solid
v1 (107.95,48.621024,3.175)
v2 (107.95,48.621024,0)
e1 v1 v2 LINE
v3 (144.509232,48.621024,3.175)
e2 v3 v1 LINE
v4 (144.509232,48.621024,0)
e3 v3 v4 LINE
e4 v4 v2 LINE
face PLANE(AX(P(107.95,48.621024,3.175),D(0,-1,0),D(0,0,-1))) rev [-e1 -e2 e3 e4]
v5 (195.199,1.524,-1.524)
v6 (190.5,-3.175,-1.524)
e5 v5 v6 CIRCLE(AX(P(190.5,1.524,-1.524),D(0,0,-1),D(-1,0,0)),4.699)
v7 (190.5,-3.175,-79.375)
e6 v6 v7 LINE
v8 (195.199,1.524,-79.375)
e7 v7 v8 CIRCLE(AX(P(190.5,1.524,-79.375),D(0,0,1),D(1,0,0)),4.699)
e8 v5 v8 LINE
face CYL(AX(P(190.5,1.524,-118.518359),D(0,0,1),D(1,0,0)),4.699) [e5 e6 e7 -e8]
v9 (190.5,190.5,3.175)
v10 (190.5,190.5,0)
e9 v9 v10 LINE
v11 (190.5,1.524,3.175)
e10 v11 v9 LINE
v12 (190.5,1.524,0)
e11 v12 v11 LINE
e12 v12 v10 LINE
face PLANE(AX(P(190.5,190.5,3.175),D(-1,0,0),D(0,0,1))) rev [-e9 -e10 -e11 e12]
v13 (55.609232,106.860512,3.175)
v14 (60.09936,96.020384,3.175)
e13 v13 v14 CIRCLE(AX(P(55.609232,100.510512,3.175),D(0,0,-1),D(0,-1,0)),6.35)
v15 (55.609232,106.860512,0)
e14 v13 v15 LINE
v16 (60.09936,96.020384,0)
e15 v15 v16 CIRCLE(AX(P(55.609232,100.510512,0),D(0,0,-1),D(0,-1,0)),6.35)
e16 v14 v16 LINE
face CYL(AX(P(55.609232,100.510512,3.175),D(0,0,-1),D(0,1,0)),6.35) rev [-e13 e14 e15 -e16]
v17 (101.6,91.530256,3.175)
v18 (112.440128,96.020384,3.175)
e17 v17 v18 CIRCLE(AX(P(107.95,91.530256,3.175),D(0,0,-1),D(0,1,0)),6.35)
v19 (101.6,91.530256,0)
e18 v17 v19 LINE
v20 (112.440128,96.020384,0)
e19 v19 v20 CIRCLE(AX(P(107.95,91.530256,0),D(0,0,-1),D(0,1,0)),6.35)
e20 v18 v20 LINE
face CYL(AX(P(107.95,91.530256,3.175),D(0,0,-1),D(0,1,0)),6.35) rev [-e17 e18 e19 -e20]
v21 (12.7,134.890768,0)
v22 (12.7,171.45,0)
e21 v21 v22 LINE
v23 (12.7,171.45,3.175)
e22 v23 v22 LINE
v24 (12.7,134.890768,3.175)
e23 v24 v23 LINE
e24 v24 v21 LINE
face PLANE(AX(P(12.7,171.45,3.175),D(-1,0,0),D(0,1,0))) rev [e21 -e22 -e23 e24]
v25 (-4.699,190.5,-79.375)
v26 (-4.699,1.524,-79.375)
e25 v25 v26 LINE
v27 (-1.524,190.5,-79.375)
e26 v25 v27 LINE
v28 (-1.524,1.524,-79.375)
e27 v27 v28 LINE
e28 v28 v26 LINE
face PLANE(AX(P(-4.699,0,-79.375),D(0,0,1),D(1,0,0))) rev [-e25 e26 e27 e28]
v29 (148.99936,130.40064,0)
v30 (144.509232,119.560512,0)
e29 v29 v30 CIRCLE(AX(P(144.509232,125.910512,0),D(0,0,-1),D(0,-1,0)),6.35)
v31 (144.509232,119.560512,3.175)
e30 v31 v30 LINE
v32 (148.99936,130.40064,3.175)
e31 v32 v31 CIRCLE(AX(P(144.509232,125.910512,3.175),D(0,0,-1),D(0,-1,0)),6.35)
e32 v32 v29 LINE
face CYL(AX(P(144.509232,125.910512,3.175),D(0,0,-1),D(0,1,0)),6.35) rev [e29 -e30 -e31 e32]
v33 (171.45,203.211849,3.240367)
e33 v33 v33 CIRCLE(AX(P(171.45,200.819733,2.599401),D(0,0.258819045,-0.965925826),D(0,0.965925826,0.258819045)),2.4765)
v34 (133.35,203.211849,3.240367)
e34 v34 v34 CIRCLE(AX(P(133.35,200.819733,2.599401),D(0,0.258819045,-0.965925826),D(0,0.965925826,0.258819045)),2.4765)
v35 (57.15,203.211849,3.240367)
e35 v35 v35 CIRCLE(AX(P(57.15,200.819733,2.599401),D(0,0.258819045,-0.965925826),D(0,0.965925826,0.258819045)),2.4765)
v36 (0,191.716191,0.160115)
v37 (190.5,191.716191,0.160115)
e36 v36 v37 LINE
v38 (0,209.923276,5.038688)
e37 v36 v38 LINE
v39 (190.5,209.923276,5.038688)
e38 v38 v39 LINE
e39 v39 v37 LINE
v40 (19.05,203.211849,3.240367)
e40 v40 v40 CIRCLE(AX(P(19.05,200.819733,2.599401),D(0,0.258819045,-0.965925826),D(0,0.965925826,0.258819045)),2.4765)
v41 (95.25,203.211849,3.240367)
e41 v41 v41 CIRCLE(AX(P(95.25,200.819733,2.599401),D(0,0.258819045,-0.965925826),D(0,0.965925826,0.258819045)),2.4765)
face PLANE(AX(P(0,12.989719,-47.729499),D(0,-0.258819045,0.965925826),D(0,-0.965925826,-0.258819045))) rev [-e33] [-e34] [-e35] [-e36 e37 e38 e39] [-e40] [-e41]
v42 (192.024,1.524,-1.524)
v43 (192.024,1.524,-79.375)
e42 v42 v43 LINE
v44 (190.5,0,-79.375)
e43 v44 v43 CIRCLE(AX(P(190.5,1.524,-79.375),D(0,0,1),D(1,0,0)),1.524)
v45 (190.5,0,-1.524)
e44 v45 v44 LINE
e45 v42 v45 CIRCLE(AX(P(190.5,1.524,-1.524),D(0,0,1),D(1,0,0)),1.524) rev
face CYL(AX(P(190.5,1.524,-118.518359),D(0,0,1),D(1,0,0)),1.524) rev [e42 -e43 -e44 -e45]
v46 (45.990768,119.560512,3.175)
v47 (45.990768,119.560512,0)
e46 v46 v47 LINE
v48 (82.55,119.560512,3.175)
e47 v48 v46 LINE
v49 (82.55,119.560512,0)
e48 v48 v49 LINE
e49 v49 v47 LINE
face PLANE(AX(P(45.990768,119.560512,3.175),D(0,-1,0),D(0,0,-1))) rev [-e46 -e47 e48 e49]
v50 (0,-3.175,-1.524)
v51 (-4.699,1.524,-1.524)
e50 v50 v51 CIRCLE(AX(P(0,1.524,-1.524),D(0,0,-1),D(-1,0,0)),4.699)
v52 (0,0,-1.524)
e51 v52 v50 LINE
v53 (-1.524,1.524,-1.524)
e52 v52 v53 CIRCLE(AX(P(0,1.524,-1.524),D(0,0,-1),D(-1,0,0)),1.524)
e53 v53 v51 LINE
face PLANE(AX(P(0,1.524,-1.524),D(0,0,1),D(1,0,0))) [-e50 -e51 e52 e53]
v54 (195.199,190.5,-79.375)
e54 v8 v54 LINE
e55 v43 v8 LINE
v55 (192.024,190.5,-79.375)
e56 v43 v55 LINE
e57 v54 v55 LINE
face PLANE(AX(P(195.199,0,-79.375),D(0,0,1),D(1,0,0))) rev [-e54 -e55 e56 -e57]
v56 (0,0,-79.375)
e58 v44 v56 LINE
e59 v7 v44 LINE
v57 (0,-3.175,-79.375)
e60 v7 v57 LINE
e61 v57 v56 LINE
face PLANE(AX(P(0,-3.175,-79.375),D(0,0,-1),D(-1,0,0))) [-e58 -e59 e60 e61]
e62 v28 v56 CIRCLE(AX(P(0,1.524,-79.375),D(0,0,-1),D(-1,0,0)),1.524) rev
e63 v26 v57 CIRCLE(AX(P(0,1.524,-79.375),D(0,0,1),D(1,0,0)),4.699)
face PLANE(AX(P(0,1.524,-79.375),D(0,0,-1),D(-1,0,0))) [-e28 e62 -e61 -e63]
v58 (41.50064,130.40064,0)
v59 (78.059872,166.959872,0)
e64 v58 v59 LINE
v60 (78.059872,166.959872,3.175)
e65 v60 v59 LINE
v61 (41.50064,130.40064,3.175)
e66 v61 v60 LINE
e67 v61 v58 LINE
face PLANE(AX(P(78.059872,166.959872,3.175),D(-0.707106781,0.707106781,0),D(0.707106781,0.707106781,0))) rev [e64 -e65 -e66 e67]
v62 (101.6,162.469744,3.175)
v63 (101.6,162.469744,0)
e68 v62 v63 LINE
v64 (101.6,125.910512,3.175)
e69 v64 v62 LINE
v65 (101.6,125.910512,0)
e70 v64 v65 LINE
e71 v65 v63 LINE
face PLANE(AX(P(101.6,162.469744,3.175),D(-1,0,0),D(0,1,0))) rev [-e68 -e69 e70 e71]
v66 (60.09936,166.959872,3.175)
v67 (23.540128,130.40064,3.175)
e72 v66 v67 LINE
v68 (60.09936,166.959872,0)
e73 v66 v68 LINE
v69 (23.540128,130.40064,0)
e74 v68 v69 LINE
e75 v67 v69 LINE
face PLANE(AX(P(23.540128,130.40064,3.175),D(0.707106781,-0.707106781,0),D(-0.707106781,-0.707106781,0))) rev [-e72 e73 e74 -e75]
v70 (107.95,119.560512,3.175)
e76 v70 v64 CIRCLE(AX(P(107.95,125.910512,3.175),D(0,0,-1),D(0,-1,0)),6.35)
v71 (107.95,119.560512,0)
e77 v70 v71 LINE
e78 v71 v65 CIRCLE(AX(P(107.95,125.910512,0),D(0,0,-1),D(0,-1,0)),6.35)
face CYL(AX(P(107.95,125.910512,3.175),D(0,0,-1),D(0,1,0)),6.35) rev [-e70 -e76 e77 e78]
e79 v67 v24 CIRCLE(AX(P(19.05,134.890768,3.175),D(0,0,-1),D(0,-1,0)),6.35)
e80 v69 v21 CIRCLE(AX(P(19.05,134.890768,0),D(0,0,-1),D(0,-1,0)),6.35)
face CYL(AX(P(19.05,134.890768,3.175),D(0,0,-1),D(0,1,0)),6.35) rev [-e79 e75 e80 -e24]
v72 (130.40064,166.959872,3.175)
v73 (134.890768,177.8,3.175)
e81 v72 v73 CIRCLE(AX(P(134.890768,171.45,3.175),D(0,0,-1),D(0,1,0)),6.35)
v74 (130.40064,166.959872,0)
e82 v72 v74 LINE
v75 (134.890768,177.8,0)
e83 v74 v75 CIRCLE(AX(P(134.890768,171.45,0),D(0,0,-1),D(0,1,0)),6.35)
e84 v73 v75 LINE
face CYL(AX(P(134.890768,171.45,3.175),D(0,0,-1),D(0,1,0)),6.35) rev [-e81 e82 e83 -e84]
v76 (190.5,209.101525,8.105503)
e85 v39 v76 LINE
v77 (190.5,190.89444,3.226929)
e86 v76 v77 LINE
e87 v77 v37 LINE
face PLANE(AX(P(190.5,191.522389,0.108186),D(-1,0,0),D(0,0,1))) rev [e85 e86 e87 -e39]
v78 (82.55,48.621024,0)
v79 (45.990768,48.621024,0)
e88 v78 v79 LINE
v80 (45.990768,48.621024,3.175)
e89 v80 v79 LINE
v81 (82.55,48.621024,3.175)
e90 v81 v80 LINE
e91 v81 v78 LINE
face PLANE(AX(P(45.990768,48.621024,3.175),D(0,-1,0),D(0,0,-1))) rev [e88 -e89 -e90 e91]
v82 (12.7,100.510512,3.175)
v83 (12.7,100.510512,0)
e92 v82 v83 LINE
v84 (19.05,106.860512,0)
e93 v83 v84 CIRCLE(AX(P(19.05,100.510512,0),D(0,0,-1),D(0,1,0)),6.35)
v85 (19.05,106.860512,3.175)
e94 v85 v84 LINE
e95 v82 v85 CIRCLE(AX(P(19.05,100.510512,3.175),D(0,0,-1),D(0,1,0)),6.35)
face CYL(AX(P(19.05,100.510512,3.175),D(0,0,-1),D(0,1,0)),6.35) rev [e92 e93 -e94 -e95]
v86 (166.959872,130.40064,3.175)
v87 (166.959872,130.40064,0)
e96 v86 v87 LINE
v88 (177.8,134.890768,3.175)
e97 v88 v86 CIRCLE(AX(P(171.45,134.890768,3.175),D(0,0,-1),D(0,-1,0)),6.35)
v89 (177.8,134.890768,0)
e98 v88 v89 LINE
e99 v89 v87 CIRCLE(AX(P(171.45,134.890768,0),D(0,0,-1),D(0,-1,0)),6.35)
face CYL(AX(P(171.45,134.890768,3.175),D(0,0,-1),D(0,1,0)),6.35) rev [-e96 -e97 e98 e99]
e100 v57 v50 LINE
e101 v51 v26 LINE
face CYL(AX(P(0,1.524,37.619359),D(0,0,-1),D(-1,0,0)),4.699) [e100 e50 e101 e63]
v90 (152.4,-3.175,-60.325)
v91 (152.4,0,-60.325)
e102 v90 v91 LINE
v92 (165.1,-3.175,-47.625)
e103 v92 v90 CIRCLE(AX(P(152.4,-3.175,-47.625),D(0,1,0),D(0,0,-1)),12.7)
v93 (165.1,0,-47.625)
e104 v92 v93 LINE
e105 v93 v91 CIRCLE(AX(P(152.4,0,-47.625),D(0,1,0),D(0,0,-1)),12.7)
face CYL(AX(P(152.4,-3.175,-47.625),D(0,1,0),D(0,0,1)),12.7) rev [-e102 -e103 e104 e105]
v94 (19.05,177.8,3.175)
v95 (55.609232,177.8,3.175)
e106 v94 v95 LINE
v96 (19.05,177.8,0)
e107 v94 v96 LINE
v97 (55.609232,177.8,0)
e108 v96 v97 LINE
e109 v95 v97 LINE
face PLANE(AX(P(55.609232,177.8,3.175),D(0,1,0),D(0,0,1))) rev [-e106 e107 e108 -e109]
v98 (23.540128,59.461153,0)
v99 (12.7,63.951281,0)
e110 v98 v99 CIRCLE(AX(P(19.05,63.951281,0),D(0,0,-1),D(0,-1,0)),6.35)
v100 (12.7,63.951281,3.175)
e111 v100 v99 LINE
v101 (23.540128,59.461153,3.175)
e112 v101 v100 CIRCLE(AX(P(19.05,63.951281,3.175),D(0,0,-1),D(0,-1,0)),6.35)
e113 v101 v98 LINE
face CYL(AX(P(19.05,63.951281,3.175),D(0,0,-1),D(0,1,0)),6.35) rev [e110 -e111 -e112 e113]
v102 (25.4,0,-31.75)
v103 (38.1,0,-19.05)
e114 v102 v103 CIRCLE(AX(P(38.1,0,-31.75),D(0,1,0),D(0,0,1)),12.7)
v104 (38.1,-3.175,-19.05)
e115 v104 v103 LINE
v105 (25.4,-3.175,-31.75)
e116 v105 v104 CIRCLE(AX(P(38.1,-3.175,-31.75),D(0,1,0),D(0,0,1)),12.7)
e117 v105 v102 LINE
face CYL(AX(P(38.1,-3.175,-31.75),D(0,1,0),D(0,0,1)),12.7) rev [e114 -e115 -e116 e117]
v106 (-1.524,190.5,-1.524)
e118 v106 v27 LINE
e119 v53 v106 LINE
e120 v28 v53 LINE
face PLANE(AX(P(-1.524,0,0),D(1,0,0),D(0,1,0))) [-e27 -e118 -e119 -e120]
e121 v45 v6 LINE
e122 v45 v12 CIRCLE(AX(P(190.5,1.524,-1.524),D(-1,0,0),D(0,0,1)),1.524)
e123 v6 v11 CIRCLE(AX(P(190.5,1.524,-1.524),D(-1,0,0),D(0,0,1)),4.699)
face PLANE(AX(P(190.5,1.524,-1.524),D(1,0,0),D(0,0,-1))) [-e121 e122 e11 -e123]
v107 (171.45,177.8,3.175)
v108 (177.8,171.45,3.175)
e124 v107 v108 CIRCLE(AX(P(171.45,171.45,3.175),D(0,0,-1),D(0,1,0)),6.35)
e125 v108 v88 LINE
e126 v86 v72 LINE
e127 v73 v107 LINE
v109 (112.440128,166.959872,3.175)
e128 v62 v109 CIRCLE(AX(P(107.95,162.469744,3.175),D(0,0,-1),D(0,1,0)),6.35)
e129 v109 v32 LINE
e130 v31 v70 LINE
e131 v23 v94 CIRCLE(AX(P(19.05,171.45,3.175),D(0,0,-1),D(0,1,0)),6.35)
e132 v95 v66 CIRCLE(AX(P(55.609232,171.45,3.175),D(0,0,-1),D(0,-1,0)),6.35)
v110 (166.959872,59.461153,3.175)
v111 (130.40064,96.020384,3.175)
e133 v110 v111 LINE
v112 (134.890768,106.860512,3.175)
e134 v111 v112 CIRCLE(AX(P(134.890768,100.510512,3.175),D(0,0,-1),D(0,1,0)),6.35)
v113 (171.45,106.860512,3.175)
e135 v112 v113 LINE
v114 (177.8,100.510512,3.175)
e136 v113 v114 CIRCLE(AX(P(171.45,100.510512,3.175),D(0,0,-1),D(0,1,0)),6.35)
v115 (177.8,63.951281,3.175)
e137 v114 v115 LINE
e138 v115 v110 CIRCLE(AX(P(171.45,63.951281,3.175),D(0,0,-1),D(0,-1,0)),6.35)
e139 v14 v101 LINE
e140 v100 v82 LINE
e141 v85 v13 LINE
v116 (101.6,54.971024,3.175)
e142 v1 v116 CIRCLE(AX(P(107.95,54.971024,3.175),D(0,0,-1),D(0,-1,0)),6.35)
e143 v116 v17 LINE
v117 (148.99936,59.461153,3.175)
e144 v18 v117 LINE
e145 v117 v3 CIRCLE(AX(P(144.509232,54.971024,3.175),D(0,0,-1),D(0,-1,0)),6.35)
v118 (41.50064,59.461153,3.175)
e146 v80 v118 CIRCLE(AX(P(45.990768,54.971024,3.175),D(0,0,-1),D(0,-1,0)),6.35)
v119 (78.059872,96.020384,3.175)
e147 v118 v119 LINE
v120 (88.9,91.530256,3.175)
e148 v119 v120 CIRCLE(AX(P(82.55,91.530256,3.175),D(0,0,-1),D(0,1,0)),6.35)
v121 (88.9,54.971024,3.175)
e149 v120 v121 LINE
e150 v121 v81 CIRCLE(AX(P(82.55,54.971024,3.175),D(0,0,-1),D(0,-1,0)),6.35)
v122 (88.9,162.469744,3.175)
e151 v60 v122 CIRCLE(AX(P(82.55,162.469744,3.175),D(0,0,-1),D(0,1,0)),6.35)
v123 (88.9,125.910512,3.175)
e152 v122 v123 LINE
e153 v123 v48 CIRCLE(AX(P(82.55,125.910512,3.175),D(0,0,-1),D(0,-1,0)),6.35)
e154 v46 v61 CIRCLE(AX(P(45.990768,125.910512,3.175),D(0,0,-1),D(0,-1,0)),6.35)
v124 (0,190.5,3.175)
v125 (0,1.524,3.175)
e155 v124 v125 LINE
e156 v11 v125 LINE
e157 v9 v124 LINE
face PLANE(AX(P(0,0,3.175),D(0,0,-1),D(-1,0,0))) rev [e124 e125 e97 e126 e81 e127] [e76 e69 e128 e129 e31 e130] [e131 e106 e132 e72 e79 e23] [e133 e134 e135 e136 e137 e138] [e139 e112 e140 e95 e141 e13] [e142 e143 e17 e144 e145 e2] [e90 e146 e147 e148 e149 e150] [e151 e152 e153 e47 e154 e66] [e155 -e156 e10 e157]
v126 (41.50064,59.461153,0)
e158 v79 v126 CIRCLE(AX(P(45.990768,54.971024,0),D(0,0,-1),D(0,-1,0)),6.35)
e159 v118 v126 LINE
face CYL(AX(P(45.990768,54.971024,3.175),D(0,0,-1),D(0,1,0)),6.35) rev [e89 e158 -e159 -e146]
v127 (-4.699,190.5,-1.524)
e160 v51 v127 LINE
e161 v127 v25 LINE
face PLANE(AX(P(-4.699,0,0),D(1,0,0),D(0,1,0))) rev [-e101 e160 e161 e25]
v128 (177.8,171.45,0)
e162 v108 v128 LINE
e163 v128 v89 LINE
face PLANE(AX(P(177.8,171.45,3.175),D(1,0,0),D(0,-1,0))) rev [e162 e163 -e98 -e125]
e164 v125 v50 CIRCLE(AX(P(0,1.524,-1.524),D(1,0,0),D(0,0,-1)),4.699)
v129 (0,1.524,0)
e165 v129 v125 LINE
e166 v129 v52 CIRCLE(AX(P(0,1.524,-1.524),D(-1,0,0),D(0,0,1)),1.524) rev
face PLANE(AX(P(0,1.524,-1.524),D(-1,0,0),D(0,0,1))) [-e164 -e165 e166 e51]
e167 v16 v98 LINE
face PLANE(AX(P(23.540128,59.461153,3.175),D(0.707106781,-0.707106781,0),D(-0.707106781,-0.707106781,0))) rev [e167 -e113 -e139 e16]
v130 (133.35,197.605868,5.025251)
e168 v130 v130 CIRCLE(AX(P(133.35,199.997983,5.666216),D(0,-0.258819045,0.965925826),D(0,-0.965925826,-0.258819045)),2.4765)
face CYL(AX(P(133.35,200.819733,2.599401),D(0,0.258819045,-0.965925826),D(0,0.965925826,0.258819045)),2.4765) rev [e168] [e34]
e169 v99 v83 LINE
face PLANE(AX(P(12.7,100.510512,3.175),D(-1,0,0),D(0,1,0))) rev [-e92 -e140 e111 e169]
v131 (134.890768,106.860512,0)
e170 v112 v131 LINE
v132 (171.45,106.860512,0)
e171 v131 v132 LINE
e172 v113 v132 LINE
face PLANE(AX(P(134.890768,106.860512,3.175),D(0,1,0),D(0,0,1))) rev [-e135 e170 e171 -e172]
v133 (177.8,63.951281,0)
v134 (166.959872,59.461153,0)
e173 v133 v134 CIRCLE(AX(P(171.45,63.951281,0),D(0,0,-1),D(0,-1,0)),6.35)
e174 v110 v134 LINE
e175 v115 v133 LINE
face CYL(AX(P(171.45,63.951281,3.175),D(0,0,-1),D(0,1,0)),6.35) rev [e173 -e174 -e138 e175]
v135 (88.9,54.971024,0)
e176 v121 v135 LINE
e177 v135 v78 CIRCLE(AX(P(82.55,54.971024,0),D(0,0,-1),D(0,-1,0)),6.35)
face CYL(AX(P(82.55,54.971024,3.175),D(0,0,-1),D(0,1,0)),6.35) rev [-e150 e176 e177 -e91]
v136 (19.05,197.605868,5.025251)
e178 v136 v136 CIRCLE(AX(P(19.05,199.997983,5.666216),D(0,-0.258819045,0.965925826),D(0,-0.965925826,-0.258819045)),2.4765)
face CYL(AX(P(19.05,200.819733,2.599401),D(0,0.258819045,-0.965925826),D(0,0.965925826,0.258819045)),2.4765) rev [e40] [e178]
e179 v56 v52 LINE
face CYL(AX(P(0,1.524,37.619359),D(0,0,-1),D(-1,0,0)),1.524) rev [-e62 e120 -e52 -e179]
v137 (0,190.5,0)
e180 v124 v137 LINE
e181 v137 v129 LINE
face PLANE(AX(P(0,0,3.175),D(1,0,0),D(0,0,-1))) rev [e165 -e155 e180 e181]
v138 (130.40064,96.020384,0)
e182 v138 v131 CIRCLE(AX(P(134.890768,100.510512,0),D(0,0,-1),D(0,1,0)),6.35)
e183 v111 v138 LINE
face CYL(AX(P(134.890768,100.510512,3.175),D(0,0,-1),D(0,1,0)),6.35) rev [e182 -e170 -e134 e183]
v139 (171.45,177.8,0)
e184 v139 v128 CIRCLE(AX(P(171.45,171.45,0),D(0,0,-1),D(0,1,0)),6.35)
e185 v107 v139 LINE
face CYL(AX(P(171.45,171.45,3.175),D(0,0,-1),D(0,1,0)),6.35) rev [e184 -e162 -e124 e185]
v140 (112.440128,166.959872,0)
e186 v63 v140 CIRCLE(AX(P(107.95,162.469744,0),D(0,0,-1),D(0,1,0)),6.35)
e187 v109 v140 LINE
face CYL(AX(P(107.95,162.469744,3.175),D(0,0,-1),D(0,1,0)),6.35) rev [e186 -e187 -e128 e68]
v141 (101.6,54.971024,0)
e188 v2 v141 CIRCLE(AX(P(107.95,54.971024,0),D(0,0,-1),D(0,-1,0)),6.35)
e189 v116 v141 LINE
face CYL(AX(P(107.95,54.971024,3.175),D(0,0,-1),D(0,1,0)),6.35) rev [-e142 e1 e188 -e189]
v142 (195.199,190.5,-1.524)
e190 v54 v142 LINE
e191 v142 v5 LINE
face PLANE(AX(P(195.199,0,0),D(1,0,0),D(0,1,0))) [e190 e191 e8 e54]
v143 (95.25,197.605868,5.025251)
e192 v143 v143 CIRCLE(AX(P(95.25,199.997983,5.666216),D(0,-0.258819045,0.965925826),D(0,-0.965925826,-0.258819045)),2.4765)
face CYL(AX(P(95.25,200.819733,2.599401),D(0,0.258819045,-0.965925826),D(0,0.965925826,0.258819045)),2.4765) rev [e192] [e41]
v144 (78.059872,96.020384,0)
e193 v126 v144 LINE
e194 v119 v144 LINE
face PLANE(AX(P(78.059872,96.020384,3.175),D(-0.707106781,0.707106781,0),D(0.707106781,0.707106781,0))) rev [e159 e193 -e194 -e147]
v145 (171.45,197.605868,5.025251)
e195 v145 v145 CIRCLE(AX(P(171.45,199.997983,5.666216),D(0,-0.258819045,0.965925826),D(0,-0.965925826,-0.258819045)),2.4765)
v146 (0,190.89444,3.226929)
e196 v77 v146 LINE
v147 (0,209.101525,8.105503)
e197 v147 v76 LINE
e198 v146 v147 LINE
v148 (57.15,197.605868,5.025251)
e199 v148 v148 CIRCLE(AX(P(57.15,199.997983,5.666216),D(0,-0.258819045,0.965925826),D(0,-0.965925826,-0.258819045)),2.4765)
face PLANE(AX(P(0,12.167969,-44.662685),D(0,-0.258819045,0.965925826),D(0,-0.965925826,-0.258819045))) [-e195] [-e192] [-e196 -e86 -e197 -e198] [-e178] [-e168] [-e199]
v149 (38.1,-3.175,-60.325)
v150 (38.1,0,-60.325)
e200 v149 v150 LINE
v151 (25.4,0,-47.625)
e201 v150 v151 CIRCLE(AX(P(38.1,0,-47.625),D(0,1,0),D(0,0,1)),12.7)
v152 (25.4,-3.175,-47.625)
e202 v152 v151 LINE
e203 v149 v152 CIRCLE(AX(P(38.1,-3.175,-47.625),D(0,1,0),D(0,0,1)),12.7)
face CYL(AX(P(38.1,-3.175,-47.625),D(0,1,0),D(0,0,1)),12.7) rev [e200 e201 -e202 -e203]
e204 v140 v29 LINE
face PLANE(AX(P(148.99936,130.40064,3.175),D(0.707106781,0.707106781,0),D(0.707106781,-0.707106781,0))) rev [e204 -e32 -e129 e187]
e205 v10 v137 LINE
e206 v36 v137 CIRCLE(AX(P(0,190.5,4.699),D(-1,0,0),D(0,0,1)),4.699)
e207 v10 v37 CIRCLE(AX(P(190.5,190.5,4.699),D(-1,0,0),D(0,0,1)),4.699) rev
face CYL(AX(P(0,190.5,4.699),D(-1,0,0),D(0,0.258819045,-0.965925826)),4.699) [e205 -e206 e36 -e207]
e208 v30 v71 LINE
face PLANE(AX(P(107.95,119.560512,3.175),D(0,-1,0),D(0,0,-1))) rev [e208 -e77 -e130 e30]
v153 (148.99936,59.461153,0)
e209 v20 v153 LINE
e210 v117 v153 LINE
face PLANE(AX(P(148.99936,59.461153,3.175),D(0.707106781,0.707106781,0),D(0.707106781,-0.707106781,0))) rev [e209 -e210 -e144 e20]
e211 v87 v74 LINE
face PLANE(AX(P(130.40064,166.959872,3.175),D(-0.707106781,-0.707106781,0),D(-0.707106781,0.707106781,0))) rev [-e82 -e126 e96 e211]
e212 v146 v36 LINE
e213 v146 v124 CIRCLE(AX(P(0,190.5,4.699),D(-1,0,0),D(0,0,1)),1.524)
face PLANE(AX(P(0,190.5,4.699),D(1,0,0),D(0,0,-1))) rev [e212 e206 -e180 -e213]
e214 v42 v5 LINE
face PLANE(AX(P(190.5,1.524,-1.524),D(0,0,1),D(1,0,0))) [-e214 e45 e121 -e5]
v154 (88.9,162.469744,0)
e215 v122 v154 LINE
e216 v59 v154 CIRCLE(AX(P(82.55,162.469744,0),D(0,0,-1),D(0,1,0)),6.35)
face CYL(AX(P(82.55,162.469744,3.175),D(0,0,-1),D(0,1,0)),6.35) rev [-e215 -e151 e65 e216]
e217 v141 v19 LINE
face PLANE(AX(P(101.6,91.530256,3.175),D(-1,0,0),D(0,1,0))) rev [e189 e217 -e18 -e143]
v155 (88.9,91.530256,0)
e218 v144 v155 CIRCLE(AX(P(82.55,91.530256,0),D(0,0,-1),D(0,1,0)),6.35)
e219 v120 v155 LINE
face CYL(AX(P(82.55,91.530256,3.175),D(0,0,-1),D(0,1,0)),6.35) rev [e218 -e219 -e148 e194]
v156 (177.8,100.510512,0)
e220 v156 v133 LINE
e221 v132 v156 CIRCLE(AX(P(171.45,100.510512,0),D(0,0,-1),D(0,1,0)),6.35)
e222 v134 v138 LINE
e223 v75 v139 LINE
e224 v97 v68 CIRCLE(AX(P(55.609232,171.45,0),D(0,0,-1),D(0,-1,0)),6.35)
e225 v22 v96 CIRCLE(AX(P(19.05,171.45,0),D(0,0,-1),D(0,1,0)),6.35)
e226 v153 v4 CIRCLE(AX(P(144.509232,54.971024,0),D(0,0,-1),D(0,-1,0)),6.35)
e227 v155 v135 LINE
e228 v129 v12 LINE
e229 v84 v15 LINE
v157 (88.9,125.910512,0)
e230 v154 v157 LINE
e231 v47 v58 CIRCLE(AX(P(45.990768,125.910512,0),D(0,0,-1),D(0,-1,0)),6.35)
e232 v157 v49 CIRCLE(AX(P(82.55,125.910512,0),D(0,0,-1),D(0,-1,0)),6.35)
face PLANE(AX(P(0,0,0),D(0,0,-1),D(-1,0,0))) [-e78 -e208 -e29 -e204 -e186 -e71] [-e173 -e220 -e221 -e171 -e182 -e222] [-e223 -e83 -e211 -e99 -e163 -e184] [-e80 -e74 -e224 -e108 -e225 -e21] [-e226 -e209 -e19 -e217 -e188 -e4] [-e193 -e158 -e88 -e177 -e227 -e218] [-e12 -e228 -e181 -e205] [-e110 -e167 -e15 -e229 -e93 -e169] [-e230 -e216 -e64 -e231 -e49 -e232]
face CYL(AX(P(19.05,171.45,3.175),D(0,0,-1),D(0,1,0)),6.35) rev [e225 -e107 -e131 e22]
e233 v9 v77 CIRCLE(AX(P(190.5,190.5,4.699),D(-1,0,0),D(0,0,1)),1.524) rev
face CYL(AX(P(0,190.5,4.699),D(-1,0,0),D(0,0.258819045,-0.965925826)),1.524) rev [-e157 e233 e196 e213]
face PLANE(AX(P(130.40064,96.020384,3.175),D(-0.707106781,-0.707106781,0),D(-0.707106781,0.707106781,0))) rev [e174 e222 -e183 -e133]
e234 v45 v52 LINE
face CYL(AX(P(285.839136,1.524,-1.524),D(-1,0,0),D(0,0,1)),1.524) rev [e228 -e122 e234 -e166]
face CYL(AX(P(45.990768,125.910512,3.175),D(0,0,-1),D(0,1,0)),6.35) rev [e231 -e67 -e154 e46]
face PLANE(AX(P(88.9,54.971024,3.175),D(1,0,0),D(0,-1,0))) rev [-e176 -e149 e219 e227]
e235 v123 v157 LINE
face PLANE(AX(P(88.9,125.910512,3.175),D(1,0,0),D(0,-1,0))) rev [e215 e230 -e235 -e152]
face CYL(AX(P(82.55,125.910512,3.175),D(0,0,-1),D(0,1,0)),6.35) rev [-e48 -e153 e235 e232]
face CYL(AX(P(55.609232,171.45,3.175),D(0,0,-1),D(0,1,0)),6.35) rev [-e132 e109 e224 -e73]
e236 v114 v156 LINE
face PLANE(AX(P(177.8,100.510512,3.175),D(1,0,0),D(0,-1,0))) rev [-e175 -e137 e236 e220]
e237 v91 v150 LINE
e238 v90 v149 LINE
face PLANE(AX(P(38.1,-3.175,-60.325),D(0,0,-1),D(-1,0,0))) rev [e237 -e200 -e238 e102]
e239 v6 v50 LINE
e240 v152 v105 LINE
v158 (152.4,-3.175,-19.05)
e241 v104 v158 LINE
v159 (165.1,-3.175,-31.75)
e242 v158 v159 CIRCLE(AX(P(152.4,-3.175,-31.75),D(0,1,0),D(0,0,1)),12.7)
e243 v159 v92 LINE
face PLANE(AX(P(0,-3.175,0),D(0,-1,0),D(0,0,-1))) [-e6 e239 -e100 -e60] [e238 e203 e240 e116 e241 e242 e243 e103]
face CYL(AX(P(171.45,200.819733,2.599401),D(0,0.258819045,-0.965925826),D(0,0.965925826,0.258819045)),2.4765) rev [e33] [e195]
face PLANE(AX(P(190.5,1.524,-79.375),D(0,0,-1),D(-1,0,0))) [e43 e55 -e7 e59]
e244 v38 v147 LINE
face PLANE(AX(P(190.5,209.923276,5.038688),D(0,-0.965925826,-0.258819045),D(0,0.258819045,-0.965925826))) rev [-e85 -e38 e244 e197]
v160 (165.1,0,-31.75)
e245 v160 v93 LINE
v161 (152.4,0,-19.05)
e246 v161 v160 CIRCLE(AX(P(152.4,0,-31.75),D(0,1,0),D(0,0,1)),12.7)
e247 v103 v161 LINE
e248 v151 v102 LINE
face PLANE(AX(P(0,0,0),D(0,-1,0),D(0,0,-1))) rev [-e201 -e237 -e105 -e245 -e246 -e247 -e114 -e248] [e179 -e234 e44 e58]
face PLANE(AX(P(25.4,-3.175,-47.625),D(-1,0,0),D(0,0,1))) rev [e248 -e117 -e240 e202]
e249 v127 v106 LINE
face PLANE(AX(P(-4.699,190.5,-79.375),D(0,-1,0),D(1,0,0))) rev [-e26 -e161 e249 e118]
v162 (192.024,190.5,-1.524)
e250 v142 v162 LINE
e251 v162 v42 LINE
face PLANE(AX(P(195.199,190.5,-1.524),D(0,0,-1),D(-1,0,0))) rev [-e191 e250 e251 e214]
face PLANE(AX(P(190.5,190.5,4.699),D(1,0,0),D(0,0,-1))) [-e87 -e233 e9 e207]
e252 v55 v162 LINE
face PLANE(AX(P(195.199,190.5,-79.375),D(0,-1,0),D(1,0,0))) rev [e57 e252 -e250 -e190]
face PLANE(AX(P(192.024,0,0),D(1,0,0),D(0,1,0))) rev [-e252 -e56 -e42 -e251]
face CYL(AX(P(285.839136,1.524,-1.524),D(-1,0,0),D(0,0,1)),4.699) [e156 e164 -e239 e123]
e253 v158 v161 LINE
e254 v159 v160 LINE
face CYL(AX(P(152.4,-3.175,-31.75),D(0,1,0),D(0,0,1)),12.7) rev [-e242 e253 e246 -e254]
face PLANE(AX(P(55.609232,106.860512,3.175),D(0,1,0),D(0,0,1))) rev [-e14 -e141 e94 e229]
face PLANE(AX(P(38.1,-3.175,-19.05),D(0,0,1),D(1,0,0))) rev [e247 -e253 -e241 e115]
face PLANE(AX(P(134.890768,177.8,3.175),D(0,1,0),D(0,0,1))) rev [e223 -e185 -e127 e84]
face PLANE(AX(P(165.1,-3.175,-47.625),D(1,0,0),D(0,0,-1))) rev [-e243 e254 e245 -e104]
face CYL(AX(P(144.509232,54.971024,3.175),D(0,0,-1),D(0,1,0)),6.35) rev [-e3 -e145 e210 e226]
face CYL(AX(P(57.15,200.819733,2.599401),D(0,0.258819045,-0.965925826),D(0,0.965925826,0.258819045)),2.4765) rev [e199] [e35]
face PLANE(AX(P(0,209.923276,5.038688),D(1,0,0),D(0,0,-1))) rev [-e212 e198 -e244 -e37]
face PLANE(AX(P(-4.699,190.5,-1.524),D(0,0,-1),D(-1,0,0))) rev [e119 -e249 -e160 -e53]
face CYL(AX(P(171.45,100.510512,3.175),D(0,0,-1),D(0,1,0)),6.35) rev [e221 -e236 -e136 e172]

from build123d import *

# Parameters (mm, degrees)
SKETCH1_W                     = 190.5
SKETCH1_H                     = 79.375
BASE_FLANGE1_DEPTH            = 3.175
CUT_EXTRUDE1_DEPTH            = 207.399421632
EDGE_FLANGE1_STRIP_W          = 15.748
EDGE_FLANGE1_STRIP_H          = 3.175
EDGE_FLANGE1_STRIP_CUT_DEPTH  = 190.5
EDGE_FLANGE1_DEPTH            = 190.5
EDGE_FLANGE2_DEPTH            = 77.851
EDGE_FLANGE2_BEND_DEPTH       = 77.851
UNFOLD4_OUTLINE_W             = 4.699
UNFOLD4_OUTLINE_H             = 77.851
UNFOLD4_OUTLINE_W_2           = 190.5
UNFOLD4_OUTLINE_H_2           = 4.699
UNFOLD4_DEPTH                 = 190.5
UNFOLD4_START                 = -3.175
UNFOLD4_2_OUTLINE_W           = 193.863532771
UNFOLD4_2_OUTLINE_H           = 77.851
UNFOLD4_2_OUTLINE_W_2         = 190.5
UNFOLD4_2_OUTLINE_H_2         = 193.863532771
UNFOLD4_2_DEPTH               = 3.175
CUT_EXTRUDE5_DEPTH            = 430.813799006
FOLD1_DEPTH                   = 190.5
FOLD1_START                   = -193.863532771
FOLD1_2_OUTLINE_W             = 3.175
FOLD1_2_OUTLINE_H             = 77.851
FOLD1_2_DEPTH                 = 189.164532771
FOLD1_START_2                 = 195.199
FOLD1_3_OUTLINE_W             = 3.175
FOLD1_3_OUTLINE_H             = 77.851
FOLD1_3_DEPTH                 = 189.164532771
FOLD1_4_DEPTH                 = 190.5
FOLD1_START_3                 = -4.699
FOLD1_5_OUTLINE_W             = 190.5
FOLD1_5_OUTLINE_H             = 77.851
FOLD1_5_DEPTH                 = 4.699
FOLD1_START_4                 = 190.5
FOLD1_6_OUTLINE_W             = 190.5
FOLD1_6_OUTLINE_H             = 77.851
FOLD1_6_DEPTH                 = 4.699
FOLD1_START_5                 = -79.375
FOLD1_7_DEPTH                 = 82.55
EDGE_FLANGE3_DEPTH            = 190.5
F_3_16_0_195_DIAMETER_HOLE1_D = 4.953


with BuildPart() as part:
    # Base-Flange1: sheet metal written as solids
    # Sketch1 → Base-Flange1 (new body)
    with BuildSketch(Plane(origin=(0, 0, 0), x_dir=(1, 0, 0), z_dir=(0, 1, 0))):
        with Locations((95.25, 39.6875)):
            Rectangle(SKETCH1_W, SKETCH1_H)
    extrude(amount=-BASE_FLANGE1_DEPTH)

    # Sketch6 → Cut-Extrude1 (cut, through all)
    with BuildSketch(Plane(origin=(0, 0, 0), x_dir=(1, 0, 0), z_dir=(0, 1, 0))):
        with BuildLine():
            Line((38.1, 60.325), (152.4, 60.325))
            ThreePointArc((152.4, 60.325), (161.380256121, 56.605256121), (165.1, 47.625))
            Line((165.1, 47.625), (165.1, 31.75))
            ThreePointArc((165.1, 31.75), (161.380256121, 22.769743879), (152.4, 19.05))
            Line((152.4, 19.05), (38.1, 19.05))
            ThreePointArc((38.1, 19.05), (29.119743879, 22.769743879), (25.4, 31.75))
            Line((25.4, 31.75), (25.4, 47.625))
            ThreePointArc((25.4, 47.625), (29.119743879, 56.605256121), (38.1, 60.325))
        make_face()
    extrude(amount=-CUT_EXTRUDE1_DEPTH, mode=Mode.SUBTRACT)

    # Edge-Flange1: sheet metal written as solids
    # Edge-Flange1 strip (on a plane across the edge) → Edge-Flange1 strip cut (cut)
    with BuildSketch(Plane(origin=(0, 0, 0), x_dir=(0, 0, -1), z_dir=(1, 0, 0))):
        with Locations((-6.35, -1.5875)):
            Rectangle(EDGE_FLANGE1_STRIP_W, EDGE_FLANGE1_STRIP_H)
    extrude(amount=EDGE_FLANGE1_STRIP_CUT_DEPTH, mode=Mode.SUBTRACT)

    # Edge-Flange1 section (on a plane across the edge) → Edge-Flange1 (add)
    with BuildSketch(Plane(origin=(0, 0, 0), x_dir=(0, 0, -1), z_dir=(1, 0, 0))):
        with BuildLine():
            Line((-3.175, 1.524), (-3.175, 190.5))
            Line((-3.175, 190.5), (0, 190.5))
            Line((0, 190.5), (0, 1.524))
            ThreePointArc((0, 1.524), (0.446369265, 0.446369265), (1.524, 0))
            Line((1.524, 0), (1.524, -3.175))
            ThreePointArc((1.524, -3.175), (-1.798694765, -1.798694765), (-3.175, 1.524))
        make_face()
    extrude(amount=EDGE_FLANGE1_DEPTH)

    # Edge-Flange2: sheet metal written as solids
    # Edge-Flange2 section (on a plane across the edge) → Edge-Flange2 (add)
    with BuildSketch(Plane(origin=(-1.524, 0, -79.375), x_dir=(1, 0, 0), z_dir=(0, 0, 1))):
        with BuildLine():
            Line((-3.175, 1.524), (-3.175, 190.5))
            Line((-3.175, 190.5), (0, 190.5))
            Line((0, 190.5), (0, 1.524))
            ThreePointArc((0, 1.524), (0.446369265, 0.446369265), (1.524, 0))
            Line((1.524, 0), (1.524, -3.175))
            ThreePointArc((1.524, -3.175), (-1.798694765, -1.798694765), (-3.175, 1.524))
        make_face()
    extrude(amount=EDGE_FLANGE2_DEPTH)

    # Edge-Flange2 section 2 (on a plane across the edge) → Edge-Flange2 bend (add)
    with BuildSketch(Plane(origin=(192.024, 0, -1.524), x_dir=(-1, 0, 0), z_dir=(0, 0, -1))):
        with BuildLine():
            Line((-3.175, 1.524), (-3.175, 190.5))
            Line((-3.175, 190.5), (0, 190.5))
            Line((0, 190.5), (0, 1.524))
            ThreePointArc((0, 1.524), (0.446369265, 0.446369265), (1.524, 0))
            Line((1.524, 0), (1.524, -3.175))
            ThreePointArc((1.524, -3.175), (-1.798694765, -1.798694765), (-3.175, 1.524))
        make_face()
    extrude(amount=EDGE_FLANGE2_BEND_DEPTH)

    # Unfold4: read off the stored shape, not the designer's step
    # Unfold4 outline → Unfold4 (cut)
    with BuildSketch(Plane(origin=(0, 0, 0), x_dir=(1, 0, 0), z_dir=(0, 1, 0))):
        with Locations((-2.3495, 40.4495)):
            Rectangle(UNFOLD4_OUTLINE_W, UNFOLD4_OUTLINE_H)
        with Locations((95.25, -0.8255)):
            Rectangle(UNFOLD4_OUTLINE_W_2, UNFOLD4_OUTLINE_H_2)
        with Locations((192.8495, 40.4495)):
            Rectangle(UNFOLD4_OUTLINE_W, UNFOLD4_OUTLINE_H)
    extrude(amount=UNFOLD4_DEPTH, mode=Mode.SUBTRACT)

    # Unfold4 2 outline → Unfold4 2 (add)
    with BuildSketch(Plane(origin=(0, 0, 0), x_dir=(1, 0, 0), z_dir=(0, 1, 0)).offset(UNFOLD4_START)):
        with Locations((287.431766385, 40.4495)):
            Rectangle(UNFOLD4_2_OUTLINE_W, UNFOLD4_2_OUTLINE_H)
        with Locations((-96.931766386, 40.4495)):
            Rectangle(UNFOLD4_2_OUTLINE_W, UNFOLD4_2_OUTLINE_H)
        with Locations((95.25, -95.407766386)):
            Rectangle(UNFOLD4_2_OUTLINE_W_2, UNFOLD4_2_OUTLINE_H_2)
    extrude(amount=UNFOLD4_2_DEPTH)

    # Sketch26 → Cut-Extrude5 (cut, through all)
    with BuildSketch(Plane(origin=(0, 0, 0), x_dir=(1, 0, 0), z_dir=(0, 1, 0))):
        with BuildLine():
            Line((177.8, -102.350045013), (177.8, -65.790813376))
            ThreePointArc((177.8, -65.790813376), (173.880039796, -59.924178345), (166.959871939, -61.300685316))
            Line((166.959871939, -61.300685316), (130.400640303, -97.859916952))
            ThreePointArc((130.400640303, -97.859916952), (129.024133332, -104.780084808), (134.890768363, -108.700045013))
            Line((134.890768363, -108.700045013), (171.45, -108.700045013))
            ThreePointArc((171.45, -108.700045013), (175.940128061, -106.840173073), (177.8, -102.350045013))
        make_face()
        with BuildLine():
            Line((148.999359697, -61.300685316), (112.440128061, -97.859916952))
            ThreePointArc((112.440128061, -97.859916952), (105.519960204, -99.236423923), (101.6, -93.369788892))
            Line((101.6, -93.369788892), (101.6, -56.810557255))
            ThreePointArc((101.6, -56.810557255), (103.459871939, -52.320429195), (107.95, -50.460557255))
            Line((107.95, -50.460557255), (144.509231637, -50.460557255))
            ThreePointArc((144.509231637, -50.460557255), (150.375866668, -54.38051746), (148.999359697, -61.300685316))
        make_face()
        with BuildLine():
            Line((88.9, -56.810557255), (88.9, -93.369788892))
            ThreePointArc((88.9, -93.369788892), (84.980039796, -99.236423923), (78.059871939, -97.859916952))
            Line((78.059871939, -97.859916952), (41.500640303, -61.300685316))
            ThreePointArc((41.500640303, -61.300685316), (40.124133332, -54.38051746), (45.990768363, -50.460557255))
            Line((45.990768363, -50.460557255), (82.55, -50.460557255))
            ThreePointArc((82.55, -50.460557255), (87.040128061, -52.320429195), (88.9, -56.810557255))
        make_face()
        with BuildLine():
            Line((55.609231637, -108.700045013), (19.05, -108.700045013))
            ThreePointArc((19.05, -108.700045013), (14.559871939, -106.840173073), (12.7, -102.350045013))
            Line((12.7, -102.350045013), (12.7, -65.790813376))
            ThreePointArc((12.7, -65.790813376), (16.619960204, -59.924178345), (23.540128061, -61.300685316))
            Line((23.540128061, -61.300685316), (60.099359697, -97.859916952))
            ThreePointArc((60.099359697, -97.859916952), (61.475866668, -104.780084808), (55.609231637, -108.700045013))
        make_face()
        with BuildLine():
            Line((177.8, -173.289532771), (177.8, -136.730301134))
            ThreePointArc((177.8, -136.730301134), (173.880039796, -130.863666103), (166.959871939, -132.240173073))
            Line((166.959871939, -132.240173073), (130.400640303, -168.79940471))
            ThreePointArc((130.400640303, -168.79940471), (129.024133332, -175.719572566), (134.890768363, -179.639532771))
            Line((134.890768363, -179.639532771), (171.45, -179.639532771))
            ThreePointArc((171.45, -179.639532771), (175.940128061, -177.779660831), (177.8, -173.289532771))
        make_face()
        with BuildLine():
            Line((148.999359697, -132.240173073), (112.440128061, -168.79940471))
            ThreePointArc((112.440128061, -168.79940471), (105.519960204, -170.175911681), (101.6, -164.30927665))
            Line((101.6, -164.30927665), (101.6, -127.750045013))
            ThreePointArc((101.6, -127.750045013), (103.459871939, -123.259916952), (107.95, -121.400045013))
            Line((107.95, -121.400045013), (144.509231637, -121.400045013))
            ThreePointArc((144.509231637, -121.400045013), (150.375866668, -125.320005217), (148.999359697, -132.240173073))
        make_face()
        with BuildLine():
            Line((88.9, -127.750045013), (88.9, -164.30927665))
            ThreePointArc((88.9, -164.30927665), (84.980039796, -170.175911681), (78.059871939, -168.79940471))
            Line((78.059871939, -168.79940471), (41.500640303, -132.240173073))
            ThreePointArc((41.500640303, -132.240173073), (40.124133332, -125.320005217), (45.990768363, -121.400045013))
            Line((45.990768363, -121.400045013), (82.55, -121.400045013))
            ThreePointArc((82.55, -121.400045013), (87.040128061, -123.259916952), (88.9, -127.750045013))
        make_face()
        with BuildLine():
            Line((55.609231637, -179.639532771), (19.05, -179.639532771))
            ThreePointArc((19.05, -179.639532771), (14.559871939, -177.779660831), (12.7, -173.289532771))
            Line((12.7, -173.289532771), (12.7, -136.730301134))
            ThreePointArc((12.7, -136.730301134), (16.619960204, -130.863666103), (23.540128061, -132.240173073))
            Line((23.540128061, -132.240173073), (60.099359697, -168.79940471))
            ThreePointArc((60.099359697, -168.79940471), (61.475866668, -175.719572566), (55.609231637, -179.639532771))
        make_face()
    extrude(amount=-CUT_EXTRUDE5_DEPTH, mode=Mode.SUBTRACT)

    # Fold1: read off the stored shape, not the designer's step
    # Fold1 outline → Fold1 (cut)
    with BuildSketch(Plane.YZ):
        with BuildLine():
            ThreePointArc((-3.175, -1.524), (-2.299733581, 1.207238272), (0, 2.921))
            Line((0, 2.921), (0, 192.339532771))
            Line((0, 192.339532771), (-3.175, 192.339532771))
            Line((-3.175, 192.339532771), (-3.175, -1.524))
        make_face()
    extrude(amount=FOLD1_DEPTH, mode=Mode.SUBTRACT)

    # Fold1 2 outline → Fold1 2 (cut)
    with BuildSketch(Plane.YZ.offset(FOLD1_START)):
        with Locations((-1.5875, -40.4495)):
            Rectangle(FOLD1_2_OUTLINE_W, FOLD1_2_OUTLINE_H)
    extrude(amount=FOLD1_2_DEPTH, mode=Mode.SUBTRACT)

    # Fold1 3 outline → Fold1 3 (cut)
    with BuildSketch(Plane.YZ.offset(FOLD1_START_2)):
        with Locations((-1.5875, -40.4495)):
            Rectangle(FOLD1_3_OUTLINE_W, FOLD1_3_OUTLINE_H)
    extrude(amount=FOLD1_3_DEPTH, mode=Mode.SUBTRACT)

    # Fold1 4 outline → Fold1 4 (add)
    with BuildSketch(Plane.YZ):
        with BuildLine():
            Line((0, 2.921), (0, -1.524))
            ThreePointArc((0, -1.524), (0.446369265, -0.446369265), (1.524, 0))
            Line((1.524, 0), (190.5, 0))
            Line((190.5, 0), (190.5, 3.175))
            Line((190.5, 3.175), (1.524, 3.175))
            ThreePointArc((1.524, 3.175), (0.751489159, 3.111065048), (0, 2.921))
        make_face()
    extrude(amount=FOLD1_4_DEPTH)

    # Fold1 5 outline → Fold1 5 (add)
    with BuildSketch(Plane.YZ.offset(FOLD1_START_3)):
        with Locations((95.25, -40.4495)):
            Rectangle(FOLD1_5_OUTLINE_W, FOLD1_5_OUTLINE_H)
    extrude(amount=FOLD1_5_DEPTH)

    # Fold1 6 outline → Fold1 6 (add)
    with BuildSketch(Plane.YZ.offset(FOLD1_START_4)):
        with Locations((95.25, -40.4495)):
            Rectangle(FOLD1_6_OUTLINE_W, FOLD1_6_OUTLINE_H)
    extrude(amount=FOLD1_6_DEPTH)

    # Fold1 7 outline → Fold1 7 (cut)
    with BuildSketch(Plane.XY.offset(FOLD1_START_5)):
        with BuildLine():
            ThreePointArc((195.199, 1.524), (193.822694765, -1.798694765), (190.5, -3.175))
            Line((190.5, -3.175), (195.199, -3.175))
            Line((195.199, -3.175), (195.199, 1.524))
        make_face()
        with BuildLine():
            Line((-4.699, -3.175), (0, -3.175))
            ThreePointArc((0, -3.175), (-3.322694765, -1.798694765), (-4.699, 1.524))
            Line((-4.699, 1.524), (-4.699, -3.175))
        make_face()
        with BuildLine():
            Line((192.024, 1.524), (192.024, 190.5))
            Line((192.024, 190.5), (190.5, 190.5))
            Line((190.5, 190.5), (190.5, 0))
            ThreePointArc((190.5, 0), (191.577630735, 0.446369265), (192.024, 1.524))
        make_face()
        with BuildLine():
            Line((0, 190.5), (-1.524, 190.5))
            Line((-1.524, 190.5), (-1.524, 1.524))
            ThreePointArc((-1.524, 1.524), (-1.077630735, 0.446369265), (0, 0))
            Line((0, 0), (0, 190.5))
        make_face()
        with BuildLine():
            ThreePointArc((12.7, 63.951280605), (16.619960205, 58.084645574), (23.540128061, 59.461152545))
            Line((23.540128061, 59.461152545), (60.099359697, 96.020384182))
            ThreePointArc((60.099359697, 96.020384182), (61.475866668, 102.940552038), (55.609231637, 106.860512242))
            Line((55.609231637, 106.860512242), (19.05, 106.860512242))
            ThreePointArc((19.05, 106.860512242), (14.559871939, 105.000640303), (12.7, 100.510512242))
            Line((12.7, 100.510512242), (12.7, 63.951280605))
        make_face()
        with BuildLine():
            ThreePointArc((177.8, 100.510512242), (175.940128061, 105.000640303), (171.45, 106.860512242))
            Line((171.45, 106.860512242), (134.890768363, 106.860512242))
            ThreePointArc((134.890768363, 106.860512242), (129.024133332, 102.940552038), (130.400640303, 96.020384182))
            Line((130.400640303, 96.020384182), (166.959871939, 59.461152545))
            ThreePointArc((166.959871939, 59.461152545), (173.880039795, 58.084645574), (177.8, 63.951280605))
            Line((177.8, 63.951280605), (177.8, 100.510512242))
        make_face()
        with BuildLine():
            ThreePointArc((19.05, 177.8), (14.559871939, 175.940128061), (12.7, 171.45))
            Line((12.7, 171.45), (12.7, 134.890768363))
            ThreePointArc((12.7, 134.890768363), (16.619960205, 129.024133332), (23.540128061, 130.400640303))
            Line((23.540128061, 130.400640303), (60.099359697, 166.959871939))
            ThreePointArc((60.099359697, 166.959871939), (61.475866668, 173.880039795), (55.609231637, 177.8))
            Line((55.609231637, 177.8), (19.05, 177.8))
        make_face()
        with BuildLine():
            ThreePointArc((82.55, 119.560512242), (87.04012806, 121.420384181), (88.9, 125.910512242))
            Line((88.9, 125.910512242), (88.9, 162.469743879))
            ThreePointArc((88.9, 162.469743879), (84.980039795, 168.33637891), (78.059871939, 166.959871939))
            Line((78.059871939, 166.959871939), (41.500640303, 130.400640303))
            ThreePointArc((41.500640303, 130.400640303), (40.124133332, 123.480472447), (45.990768363, 119.560512242))
            Line((45.990768363, 119.560512242), (82.55, 119.560512242))
        make_face()
        with BuildLine():
            ThreePointArc((82.55, 48.621024484), (87.04012806, 50.480896423), (88.9, 54.971024484))
            Line((88.9, 54.971024484), (88.9, 91.530256121))
            ThreePointArc((88.9, 91.530256121), (84.980039796, 97.396891153), (78.059871939, 96.020384182))
            Line((78.059871939, 96.020384182), (41.500640303, 59.461152545))
            ThreePointArc((41.500640303, 59.461152545), (40.124133332, 52.540984689), (45.990768363, 48.621024484))
            Line((45.990768363, 48.621024484), (82.55, 48.621024484))
        make_face()
        with BuildLine():
            ThreePointArc((101.6, 125.910512242), (103.45987194, 121.420384181), (107.95, 119.560512242))
            Line((107.95, 119.560512242), (144.509231637, 119.560512242))
            ThreePointArc((144.509231637, 119.560512242), (150.375866668, 123.480472447), (148.999359697, 130.400640303))
            Line((148.999359697, 130.400640303), (112.440128061, 166.959871939))
            ThreePointArc((112.440128061, 166.959871939), (105.519960205, 168.33637891), (101.6, 162.469743879))
            Line((101.6, 162.469743879), (101.6, 125.910512242))
        make_face()
        with BuildLine():
            ThreePointArc((112.440128061, 96.020384182), (105.519960204, 97.396891153), (101.6, 91.530256121))
            Line((101.6, 91.530256121), (101.6, 54.971024484))
            ThreePointArc((101.6, 54.971024484), (103.459871939, 50.480896423), (107.95, 48.621024484))
            Line((107.95, 48.621024484), (144.509231637, 48.621024484))
            ThreePointArc((144.509231637, 48.621024484), (150.375866668, 52.540984689), (148.999359697, 59.461152545))
            Line((148.999359697, 59.461152545), (112.440128061, 96.020384182))
        make_face()
        with BuildLine():
            ThreePointArc((166.959871939, 130.400640303), (173.880039795, 129.024133332), (177.8, 134.890768363))
            Line((177.8, 134.890768363), (177.8, 171.45))
            ThreePointArc((177.8, 171.45), (175.940128061, 175.940128061), (171.45, 177.8))
            Line((171.45, 177.8), (134.890768363, 177.8))
            ThreePointArc((134.890768363, 177.8), (129.024133332, 173.880039795), (130.400640303, 166.959871939))
            Line((130.400640303, 166.959871939), (166.959871939, 130.400640303))
        make_face()
    extrude(amount=FOLD1_7_DEPTH, mode=Mode.SUBTRACT)

    # Edge-Flange3: sheet metal written as solids
    # Edge-Flange3 section (on a plane across the edge) → Edge-Flange3 (add)
    with BuildSketch(Plane(origin=(190.5, 190.700638406, 3.175), x_dir=(0, -0.2588190451025154, 0.9659258262890698), z_dir=(-1, 0, 0))):
        with BuildLine():
            Line((-3.175, 0.200638406), (-3.175, 19.05))
            Line((-3.175, 19.05), (0, 19.05))
            Line((0, 19.05), (0, 0.200638406))
            ThreePointArc((0, 0.200638406), (0.013038031, 0.001716489), (0.051929041, -0.193801818))
            Line((0.051929041, -0.193801818), (-3.014885458, -1.015552287))
            ThreePointArc((-3.014885458, -1.015552287), (-3.134799404, -0.412704171), (-3.175, 0.200638406))
        make_face()
    extrude(amount=EDGE_FLANGE3_DEPTH)

    # 3/16 (0.195) Diameter Hole1 (through all)
    with Locations(Plane(origin=(0, 12.802520982, -47.779658772), x_dir=(-1, 0, 0), z_dir=(0, 0.2588190451025156, -0.9659258262890698))):
        with Locations((-19.05, 194.649741398), (-171.45, 194.649741398), (-133.35, 194.649741398), (-95.25, 194.649741398), (-57.15, 194.649741398)):
            Hole(F_3_16_0_195_DIAMETER_HOLE1_D / 2)


solid = part.part
